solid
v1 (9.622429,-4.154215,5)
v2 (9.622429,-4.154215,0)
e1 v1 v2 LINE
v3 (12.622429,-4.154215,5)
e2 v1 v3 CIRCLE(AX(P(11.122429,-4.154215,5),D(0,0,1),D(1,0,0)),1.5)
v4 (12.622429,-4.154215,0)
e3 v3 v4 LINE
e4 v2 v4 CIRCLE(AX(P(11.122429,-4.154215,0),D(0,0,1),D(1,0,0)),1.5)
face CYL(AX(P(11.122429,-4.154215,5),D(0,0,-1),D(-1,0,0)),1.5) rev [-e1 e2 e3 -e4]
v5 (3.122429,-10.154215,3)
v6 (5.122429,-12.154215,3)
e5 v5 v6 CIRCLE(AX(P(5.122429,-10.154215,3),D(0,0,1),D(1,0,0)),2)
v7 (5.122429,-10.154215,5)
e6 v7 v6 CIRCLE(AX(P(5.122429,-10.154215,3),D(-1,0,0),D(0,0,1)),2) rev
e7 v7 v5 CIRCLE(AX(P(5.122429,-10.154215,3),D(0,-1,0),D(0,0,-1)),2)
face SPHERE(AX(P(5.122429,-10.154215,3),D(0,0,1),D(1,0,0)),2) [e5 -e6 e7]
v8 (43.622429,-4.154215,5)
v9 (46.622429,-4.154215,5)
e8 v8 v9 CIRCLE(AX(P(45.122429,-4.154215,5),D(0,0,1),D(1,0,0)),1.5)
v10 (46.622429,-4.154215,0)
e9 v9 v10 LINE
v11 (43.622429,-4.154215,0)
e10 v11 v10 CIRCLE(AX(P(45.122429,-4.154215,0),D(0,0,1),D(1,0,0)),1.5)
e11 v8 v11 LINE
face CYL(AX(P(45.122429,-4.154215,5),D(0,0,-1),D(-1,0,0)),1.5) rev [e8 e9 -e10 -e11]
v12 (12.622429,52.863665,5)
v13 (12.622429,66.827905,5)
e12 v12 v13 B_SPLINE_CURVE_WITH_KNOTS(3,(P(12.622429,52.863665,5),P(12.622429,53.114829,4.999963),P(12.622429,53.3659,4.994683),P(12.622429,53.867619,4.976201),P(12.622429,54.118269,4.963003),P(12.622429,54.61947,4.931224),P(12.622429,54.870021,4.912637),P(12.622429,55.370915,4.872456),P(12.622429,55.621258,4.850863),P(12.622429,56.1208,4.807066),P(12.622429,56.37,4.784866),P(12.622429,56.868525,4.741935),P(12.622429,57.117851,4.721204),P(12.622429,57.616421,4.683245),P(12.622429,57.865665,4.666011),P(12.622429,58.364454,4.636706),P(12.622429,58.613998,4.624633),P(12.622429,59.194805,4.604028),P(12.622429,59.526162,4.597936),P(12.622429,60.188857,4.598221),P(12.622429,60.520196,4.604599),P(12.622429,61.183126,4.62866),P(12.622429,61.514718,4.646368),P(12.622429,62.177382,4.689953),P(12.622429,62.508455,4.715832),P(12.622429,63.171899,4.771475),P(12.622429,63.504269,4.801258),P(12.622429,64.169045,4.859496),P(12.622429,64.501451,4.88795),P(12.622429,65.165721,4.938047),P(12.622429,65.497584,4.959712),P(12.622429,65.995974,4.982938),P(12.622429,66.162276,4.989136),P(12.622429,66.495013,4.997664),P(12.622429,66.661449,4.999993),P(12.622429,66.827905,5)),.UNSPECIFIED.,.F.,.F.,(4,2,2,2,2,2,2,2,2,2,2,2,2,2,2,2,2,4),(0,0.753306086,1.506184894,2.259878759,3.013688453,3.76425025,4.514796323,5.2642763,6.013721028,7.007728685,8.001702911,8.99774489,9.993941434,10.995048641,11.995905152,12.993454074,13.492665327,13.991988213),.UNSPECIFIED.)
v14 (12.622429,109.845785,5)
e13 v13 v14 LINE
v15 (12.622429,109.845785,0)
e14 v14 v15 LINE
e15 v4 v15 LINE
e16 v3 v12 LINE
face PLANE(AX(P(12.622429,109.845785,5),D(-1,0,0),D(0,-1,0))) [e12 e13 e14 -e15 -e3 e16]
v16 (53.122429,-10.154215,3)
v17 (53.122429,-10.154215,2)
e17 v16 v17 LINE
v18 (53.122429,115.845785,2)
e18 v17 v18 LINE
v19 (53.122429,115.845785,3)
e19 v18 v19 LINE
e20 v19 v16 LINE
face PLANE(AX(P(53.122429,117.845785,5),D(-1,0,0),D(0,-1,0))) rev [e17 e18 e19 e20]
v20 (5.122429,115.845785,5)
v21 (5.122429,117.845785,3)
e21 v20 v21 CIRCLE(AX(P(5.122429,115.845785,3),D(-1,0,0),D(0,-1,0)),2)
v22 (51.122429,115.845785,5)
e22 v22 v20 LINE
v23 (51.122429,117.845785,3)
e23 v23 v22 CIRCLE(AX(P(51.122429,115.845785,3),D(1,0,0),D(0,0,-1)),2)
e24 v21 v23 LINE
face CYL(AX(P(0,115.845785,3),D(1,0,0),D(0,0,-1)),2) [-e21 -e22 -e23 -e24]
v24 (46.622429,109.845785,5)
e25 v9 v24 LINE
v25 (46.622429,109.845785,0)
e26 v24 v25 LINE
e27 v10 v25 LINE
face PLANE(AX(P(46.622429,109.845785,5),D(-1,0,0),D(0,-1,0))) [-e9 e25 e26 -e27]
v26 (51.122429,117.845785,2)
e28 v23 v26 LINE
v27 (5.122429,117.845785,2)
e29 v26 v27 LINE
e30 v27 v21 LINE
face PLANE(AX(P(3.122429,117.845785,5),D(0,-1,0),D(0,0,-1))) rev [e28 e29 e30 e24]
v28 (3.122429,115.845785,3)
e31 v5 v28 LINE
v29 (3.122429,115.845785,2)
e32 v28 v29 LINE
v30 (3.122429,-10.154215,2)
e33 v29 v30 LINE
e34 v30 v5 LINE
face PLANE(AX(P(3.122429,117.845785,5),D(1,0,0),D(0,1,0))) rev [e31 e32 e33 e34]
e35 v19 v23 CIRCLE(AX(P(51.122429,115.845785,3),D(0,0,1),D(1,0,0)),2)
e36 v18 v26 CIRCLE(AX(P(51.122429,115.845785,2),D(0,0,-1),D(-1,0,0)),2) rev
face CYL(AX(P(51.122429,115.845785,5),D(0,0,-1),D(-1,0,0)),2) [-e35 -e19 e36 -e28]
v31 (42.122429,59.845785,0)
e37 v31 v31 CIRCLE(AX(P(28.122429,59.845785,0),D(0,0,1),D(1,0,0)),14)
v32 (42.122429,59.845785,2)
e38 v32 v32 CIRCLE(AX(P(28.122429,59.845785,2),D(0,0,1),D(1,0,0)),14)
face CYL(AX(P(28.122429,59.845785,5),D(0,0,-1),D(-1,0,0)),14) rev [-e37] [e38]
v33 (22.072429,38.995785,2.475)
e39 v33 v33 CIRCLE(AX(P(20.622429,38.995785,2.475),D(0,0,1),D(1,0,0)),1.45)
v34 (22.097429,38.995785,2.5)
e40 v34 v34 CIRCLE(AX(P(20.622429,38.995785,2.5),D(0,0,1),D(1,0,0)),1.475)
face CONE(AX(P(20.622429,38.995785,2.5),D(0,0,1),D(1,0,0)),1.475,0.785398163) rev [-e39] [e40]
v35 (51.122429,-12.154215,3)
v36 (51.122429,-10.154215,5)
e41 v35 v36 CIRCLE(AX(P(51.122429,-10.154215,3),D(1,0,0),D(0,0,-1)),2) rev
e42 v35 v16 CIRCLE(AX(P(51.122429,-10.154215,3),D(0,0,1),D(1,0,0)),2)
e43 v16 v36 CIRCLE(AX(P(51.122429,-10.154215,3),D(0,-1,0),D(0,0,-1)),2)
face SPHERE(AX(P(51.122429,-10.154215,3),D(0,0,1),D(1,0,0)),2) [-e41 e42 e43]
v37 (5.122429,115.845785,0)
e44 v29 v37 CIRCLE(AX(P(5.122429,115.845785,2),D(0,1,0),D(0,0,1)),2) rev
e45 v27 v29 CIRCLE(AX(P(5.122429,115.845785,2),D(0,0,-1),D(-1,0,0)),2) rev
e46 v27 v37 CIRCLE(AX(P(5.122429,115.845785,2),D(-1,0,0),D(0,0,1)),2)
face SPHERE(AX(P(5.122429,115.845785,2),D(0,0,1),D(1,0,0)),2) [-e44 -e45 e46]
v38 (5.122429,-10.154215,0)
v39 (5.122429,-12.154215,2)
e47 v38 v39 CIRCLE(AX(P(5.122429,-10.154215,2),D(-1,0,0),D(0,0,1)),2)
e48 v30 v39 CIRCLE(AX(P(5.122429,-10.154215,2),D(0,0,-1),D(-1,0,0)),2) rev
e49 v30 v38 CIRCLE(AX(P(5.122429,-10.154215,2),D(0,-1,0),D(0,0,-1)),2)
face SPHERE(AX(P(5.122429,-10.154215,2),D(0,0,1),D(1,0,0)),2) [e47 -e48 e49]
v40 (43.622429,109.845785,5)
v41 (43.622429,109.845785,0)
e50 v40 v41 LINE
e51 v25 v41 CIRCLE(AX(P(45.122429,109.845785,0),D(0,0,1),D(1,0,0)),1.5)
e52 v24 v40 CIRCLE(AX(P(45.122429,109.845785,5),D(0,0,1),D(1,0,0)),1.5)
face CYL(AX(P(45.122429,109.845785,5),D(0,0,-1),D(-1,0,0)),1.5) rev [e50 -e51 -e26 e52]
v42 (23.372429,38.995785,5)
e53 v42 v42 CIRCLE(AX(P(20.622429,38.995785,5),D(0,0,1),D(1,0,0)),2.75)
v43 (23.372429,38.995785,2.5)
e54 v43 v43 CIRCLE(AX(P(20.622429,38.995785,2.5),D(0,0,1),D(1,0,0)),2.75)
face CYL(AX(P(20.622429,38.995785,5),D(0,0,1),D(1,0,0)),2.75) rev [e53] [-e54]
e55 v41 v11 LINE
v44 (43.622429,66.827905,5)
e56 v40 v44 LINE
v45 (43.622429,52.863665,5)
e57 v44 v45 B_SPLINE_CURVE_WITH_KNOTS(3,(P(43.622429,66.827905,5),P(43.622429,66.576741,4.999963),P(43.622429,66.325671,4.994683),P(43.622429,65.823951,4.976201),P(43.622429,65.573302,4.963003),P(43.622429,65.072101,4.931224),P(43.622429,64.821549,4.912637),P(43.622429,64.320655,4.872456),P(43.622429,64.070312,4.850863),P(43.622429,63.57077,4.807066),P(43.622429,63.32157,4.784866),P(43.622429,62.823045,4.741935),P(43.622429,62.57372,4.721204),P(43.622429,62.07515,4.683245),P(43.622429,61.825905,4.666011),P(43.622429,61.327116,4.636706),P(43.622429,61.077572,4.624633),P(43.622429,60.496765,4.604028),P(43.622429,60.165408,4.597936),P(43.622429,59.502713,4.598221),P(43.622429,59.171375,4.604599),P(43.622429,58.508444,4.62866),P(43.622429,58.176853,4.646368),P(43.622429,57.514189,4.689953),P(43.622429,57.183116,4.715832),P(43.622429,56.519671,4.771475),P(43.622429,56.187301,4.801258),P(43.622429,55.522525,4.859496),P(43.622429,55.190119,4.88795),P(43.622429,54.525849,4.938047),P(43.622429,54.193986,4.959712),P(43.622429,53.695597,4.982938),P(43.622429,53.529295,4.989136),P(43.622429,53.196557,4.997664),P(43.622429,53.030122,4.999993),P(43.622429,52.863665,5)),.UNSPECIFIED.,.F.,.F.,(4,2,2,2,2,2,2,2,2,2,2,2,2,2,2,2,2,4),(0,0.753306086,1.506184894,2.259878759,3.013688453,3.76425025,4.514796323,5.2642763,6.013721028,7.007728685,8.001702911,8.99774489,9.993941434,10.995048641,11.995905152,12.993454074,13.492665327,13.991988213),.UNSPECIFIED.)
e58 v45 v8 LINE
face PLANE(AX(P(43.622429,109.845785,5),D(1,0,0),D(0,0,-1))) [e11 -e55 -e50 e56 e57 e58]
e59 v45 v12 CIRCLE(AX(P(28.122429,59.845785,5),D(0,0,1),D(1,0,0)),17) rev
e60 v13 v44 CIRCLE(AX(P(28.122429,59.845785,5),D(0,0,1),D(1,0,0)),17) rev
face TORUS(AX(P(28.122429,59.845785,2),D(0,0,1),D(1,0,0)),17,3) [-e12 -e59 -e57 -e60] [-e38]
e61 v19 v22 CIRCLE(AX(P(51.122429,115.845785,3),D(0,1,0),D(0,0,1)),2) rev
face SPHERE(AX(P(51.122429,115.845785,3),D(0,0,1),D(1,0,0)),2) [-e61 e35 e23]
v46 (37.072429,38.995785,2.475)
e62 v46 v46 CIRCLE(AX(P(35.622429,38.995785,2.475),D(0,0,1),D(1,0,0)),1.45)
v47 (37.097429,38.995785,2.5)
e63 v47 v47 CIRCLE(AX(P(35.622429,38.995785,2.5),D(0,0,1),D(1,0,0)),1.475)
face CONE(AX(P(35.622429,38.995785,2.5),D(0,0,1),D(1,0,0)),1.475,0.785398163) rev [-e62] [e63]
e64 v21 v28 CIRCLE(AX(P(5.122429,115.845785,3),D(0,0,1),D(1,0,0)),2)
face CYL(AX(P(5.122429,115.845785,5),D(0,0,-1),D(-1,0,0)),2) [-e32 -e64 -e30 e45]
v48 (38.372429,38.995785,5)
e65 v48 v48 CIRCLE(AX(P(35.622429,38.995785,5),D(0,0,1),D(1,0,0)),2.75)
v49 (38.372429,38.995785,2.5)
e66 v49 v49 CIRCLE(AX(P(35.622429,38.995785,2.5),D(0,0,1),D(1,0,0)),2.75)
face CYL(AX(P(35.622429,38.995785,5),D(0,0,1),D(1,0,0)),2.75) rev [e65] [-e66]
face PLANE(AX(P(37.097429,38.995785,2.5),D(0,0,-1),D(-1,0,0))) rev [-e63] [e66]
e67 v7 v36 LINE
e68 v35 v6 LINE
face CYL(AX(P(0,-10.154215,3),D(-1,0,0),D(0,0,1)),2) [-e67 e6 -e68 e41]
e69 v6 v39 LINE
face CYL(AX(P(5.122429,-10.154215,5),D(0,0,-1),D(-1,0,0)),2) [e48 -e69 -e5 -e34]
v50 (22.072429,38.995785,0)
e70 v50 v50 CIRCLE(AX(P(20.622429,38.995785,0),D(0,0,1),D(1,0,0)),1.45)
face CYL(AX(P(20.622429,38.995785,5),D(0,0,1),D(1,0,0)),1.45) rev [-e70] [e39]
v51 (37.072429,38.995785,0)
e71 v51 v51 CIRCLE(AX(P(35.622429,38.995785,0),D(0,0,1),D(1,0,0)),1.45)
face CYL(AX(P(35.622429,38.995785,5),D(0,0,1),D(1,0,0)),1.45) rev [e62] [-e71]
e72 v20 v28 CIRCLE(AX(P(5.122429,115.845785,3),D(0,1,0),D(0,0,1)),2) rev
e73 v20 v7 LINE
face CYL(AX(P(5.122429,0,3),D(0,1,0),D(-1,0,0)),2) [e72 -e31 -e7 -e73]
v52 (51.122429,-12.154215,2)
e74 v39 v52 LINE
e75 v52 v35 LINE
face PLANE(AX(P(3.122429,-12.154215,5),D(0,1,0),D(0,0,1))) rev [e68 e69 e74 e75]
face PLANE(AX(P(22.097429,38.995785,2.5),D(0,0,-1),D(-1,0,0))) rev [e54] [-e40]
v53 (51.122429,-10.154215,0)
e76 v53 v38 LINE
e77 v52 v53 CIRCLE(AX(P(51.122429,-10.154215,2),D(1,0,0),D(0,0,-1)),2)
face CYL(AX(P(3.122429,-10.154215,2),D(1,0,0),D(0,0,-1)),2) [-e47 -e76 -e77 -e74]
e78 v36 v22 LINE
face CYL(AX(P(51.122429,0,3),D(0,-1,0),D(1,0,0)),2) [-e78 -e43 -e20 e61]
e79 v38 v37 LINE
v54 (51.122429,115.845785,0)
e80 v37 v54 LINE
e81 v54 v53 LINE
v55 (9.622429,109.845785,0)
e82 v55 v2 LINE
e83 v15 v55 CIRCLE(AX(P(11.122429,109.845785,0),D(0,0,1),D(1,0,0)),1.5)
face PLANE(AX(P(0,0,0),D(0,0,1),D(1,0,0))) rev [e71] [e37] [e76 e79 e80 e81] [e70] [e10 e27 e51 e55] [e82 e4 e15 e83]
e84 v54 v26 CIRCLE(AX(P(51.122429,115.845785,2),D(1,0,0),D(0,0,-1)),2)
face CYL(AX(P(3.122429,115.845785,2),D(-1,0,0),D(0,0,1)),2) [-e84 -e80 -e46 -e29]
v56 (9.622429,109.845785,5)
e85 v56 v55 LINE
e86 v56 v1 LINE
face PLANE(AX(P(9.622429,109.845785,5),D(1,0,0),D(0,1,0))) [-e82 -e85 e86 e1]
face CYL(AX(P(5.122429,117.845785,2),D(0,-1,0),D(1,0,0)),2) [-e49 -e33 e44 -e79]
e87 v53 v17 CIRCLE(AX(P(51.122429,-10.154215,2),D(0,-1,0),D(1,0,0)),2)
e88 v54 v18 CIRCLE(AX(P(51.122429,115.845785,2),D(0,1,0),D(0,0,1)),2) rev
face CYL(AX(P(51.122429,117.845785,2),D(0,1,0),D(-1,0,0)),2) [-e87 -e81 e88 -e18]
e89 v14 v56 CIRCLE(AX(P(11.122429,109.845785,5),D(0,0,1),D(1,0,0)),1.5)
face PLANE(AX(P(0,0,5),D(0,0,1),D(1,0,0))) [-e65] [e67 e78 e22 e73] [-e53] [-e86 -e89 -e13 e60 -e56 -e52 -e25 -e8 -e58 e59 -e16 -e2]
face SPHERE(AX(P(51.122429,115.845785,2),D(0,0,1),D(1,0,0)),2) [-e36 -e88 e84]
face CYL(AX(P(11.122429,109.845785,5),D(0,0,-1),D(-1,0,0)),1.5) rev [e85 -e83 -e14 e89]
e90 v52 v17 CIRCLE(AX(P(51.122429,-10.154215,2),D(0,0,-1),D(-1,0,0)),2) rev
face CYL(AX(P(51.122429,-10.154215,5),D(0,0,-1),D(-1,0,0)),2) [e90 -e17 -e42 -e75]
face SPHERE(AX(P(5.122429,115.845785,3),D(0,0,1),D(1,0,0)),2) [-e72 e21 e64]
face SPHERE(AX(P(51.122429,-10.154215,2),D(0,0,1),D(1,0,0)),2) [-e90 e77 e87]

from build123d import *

# Parameters (mm, degrees)
BASE_W                          = 50
BASE_H                          = 130
BASE_R                          = 14
BOSS_EXTRUDE1_DEPTH             = 5
CBORE_FOR_M2_5_SHCS1_AT_2_COUNT = 2
CBORE_FOR_M2_5_SHCS1_AT_2_PITCH = 15
FILLET3_R                       = 2
FILLET5_R                       = 3


with BuildPart() as part:
    # Base → Boss-Extrude1 (new body)
    with BuildSketch(Plane.XY):
        with Locations((28.12242927, 52.845785243)):
            Rectangle(BASE_W, BASE_H)
        with Locations((28.12242927, 59.845785243)):
            Circle(BASE_R, mode=Mode.SUBTRACT)
        with BuildLine():
            Line((46.62242927, 109.845785243), (46.62242927, -4.154214757))
            ThreePointArc((46.62242927, -4.154214757), (45.12242927, -5.654214757), (43.62242927, -4.154214757))
            Line((43.62242927, -4.154214757), (43.62242927, 109.845785243))
            ThreePointArc((43.62242927, 109.845785243), (45.12242927, 111.345785243), (46.62242927, 109.845785243))
        make_face(mode=Mode.SUBTRACT)
        with BuildLine():
            Line((12.62242927, 109.845785243), (12.62242927, -4.154214757))
            ThreePointArc((12.62242927, -4.154214757), (11.12242927, -5.654214757), (9.62242927, -4.154214757))
            Line((9.62242927, -4.154214757), (9.62242927, 109.845785243))
            ThreePointArc((9.62242927, 109.845785243), (11.12242927, 111.345785243), (12.62242927, 109.845785243))
        make_face(mode=Mode.SUBTRACT)
    extrude(amount=BOSS_EXTRUDE1_DEPTH)

    # Sketch5 → CBORE for M2.5 SHCS1 (revolve, cut)
    with BuildSketch(Plane(origin=(20.62242927, 38.995785243, 5), x_dir=(0, -1, 0), z_dir=(1, 0, 0))):
        Polygon((0, 0), (0, 5), (1.45, 5), (1.45, 2.525), (1.475, 2.5), (2.75, 2.5), (2.75, 0), align=None)
    cbore_for_m2_5_shcs1 = revolve(axis=Axis((20.62242927, 38.995785243, 11.35), (0, 0, -1)), mode=Mode.SUBTRACT)

    # CBORE for M2.5 SHCS1 at 2: CBORE for M2.5 SHCS1 ×2
    with Locations(*[(i * CBORE_FOR_M2_5_SHCS1_AT_2_PITCH, 0, 0) for i in range(1, CBORE_FOR_M2_5_SHCS1_AT_2_COUNT)]):
        add(cbore_for_m2_5_shcs1, mode=Mode.SUBTRACT)

    # Fillet3
    fillet3_edges = [part.edges().sort_by_distance(p)[0] for p in [
        (53.12242927, 52.845785243, 5),
        (28.12242927, 117.845785243, 5),
        (3.12242927, 52.845785243, 5),
        (28.12242927, 117.845785243, 0),
        (53.12242927, 52.845785243, 0),
        (28.12242927, -12.154214757, 0),
        (3.12242927, 52.845785243, 0),
        (28.12242927, -12.154214757, 5),
        (3.12242927, 117.845785243, 2.5),
        (53.12242927, 117.845785243, 2.5),
        (53.12242927, -12.154214757, 2.5),
        (3.12242927, -12.154214757, 2.5),
    ]]
    fillet(fillet3_edges, radius=FILLET3_R)

    # Fillet5
    # the kernel refuses this fillet: 3 mm, written as the material it takes off along each edge
    with BuildSketch(Plane(origin=(28.12242927, 59.845785243, 5), x_dir=(1, 0, 0), z_dir=(0, -1, 0))) as fillet5_piece_1:
        with BuildLine():
            CenterArc((14 + FILLET5_R, -FILLET5_R), FILLET5_R, 90, 90)
            Line((14, -FILLET5_R), (14, 0))
            Line((14, 0), (14 + FILLET5_R, 0))
        make_face()
    revolve(axis=Axis((28.12242927, 59.845785243, 5), (0, 0, 1)), mode=Mode.SUBTRACT)


solid = part.part
